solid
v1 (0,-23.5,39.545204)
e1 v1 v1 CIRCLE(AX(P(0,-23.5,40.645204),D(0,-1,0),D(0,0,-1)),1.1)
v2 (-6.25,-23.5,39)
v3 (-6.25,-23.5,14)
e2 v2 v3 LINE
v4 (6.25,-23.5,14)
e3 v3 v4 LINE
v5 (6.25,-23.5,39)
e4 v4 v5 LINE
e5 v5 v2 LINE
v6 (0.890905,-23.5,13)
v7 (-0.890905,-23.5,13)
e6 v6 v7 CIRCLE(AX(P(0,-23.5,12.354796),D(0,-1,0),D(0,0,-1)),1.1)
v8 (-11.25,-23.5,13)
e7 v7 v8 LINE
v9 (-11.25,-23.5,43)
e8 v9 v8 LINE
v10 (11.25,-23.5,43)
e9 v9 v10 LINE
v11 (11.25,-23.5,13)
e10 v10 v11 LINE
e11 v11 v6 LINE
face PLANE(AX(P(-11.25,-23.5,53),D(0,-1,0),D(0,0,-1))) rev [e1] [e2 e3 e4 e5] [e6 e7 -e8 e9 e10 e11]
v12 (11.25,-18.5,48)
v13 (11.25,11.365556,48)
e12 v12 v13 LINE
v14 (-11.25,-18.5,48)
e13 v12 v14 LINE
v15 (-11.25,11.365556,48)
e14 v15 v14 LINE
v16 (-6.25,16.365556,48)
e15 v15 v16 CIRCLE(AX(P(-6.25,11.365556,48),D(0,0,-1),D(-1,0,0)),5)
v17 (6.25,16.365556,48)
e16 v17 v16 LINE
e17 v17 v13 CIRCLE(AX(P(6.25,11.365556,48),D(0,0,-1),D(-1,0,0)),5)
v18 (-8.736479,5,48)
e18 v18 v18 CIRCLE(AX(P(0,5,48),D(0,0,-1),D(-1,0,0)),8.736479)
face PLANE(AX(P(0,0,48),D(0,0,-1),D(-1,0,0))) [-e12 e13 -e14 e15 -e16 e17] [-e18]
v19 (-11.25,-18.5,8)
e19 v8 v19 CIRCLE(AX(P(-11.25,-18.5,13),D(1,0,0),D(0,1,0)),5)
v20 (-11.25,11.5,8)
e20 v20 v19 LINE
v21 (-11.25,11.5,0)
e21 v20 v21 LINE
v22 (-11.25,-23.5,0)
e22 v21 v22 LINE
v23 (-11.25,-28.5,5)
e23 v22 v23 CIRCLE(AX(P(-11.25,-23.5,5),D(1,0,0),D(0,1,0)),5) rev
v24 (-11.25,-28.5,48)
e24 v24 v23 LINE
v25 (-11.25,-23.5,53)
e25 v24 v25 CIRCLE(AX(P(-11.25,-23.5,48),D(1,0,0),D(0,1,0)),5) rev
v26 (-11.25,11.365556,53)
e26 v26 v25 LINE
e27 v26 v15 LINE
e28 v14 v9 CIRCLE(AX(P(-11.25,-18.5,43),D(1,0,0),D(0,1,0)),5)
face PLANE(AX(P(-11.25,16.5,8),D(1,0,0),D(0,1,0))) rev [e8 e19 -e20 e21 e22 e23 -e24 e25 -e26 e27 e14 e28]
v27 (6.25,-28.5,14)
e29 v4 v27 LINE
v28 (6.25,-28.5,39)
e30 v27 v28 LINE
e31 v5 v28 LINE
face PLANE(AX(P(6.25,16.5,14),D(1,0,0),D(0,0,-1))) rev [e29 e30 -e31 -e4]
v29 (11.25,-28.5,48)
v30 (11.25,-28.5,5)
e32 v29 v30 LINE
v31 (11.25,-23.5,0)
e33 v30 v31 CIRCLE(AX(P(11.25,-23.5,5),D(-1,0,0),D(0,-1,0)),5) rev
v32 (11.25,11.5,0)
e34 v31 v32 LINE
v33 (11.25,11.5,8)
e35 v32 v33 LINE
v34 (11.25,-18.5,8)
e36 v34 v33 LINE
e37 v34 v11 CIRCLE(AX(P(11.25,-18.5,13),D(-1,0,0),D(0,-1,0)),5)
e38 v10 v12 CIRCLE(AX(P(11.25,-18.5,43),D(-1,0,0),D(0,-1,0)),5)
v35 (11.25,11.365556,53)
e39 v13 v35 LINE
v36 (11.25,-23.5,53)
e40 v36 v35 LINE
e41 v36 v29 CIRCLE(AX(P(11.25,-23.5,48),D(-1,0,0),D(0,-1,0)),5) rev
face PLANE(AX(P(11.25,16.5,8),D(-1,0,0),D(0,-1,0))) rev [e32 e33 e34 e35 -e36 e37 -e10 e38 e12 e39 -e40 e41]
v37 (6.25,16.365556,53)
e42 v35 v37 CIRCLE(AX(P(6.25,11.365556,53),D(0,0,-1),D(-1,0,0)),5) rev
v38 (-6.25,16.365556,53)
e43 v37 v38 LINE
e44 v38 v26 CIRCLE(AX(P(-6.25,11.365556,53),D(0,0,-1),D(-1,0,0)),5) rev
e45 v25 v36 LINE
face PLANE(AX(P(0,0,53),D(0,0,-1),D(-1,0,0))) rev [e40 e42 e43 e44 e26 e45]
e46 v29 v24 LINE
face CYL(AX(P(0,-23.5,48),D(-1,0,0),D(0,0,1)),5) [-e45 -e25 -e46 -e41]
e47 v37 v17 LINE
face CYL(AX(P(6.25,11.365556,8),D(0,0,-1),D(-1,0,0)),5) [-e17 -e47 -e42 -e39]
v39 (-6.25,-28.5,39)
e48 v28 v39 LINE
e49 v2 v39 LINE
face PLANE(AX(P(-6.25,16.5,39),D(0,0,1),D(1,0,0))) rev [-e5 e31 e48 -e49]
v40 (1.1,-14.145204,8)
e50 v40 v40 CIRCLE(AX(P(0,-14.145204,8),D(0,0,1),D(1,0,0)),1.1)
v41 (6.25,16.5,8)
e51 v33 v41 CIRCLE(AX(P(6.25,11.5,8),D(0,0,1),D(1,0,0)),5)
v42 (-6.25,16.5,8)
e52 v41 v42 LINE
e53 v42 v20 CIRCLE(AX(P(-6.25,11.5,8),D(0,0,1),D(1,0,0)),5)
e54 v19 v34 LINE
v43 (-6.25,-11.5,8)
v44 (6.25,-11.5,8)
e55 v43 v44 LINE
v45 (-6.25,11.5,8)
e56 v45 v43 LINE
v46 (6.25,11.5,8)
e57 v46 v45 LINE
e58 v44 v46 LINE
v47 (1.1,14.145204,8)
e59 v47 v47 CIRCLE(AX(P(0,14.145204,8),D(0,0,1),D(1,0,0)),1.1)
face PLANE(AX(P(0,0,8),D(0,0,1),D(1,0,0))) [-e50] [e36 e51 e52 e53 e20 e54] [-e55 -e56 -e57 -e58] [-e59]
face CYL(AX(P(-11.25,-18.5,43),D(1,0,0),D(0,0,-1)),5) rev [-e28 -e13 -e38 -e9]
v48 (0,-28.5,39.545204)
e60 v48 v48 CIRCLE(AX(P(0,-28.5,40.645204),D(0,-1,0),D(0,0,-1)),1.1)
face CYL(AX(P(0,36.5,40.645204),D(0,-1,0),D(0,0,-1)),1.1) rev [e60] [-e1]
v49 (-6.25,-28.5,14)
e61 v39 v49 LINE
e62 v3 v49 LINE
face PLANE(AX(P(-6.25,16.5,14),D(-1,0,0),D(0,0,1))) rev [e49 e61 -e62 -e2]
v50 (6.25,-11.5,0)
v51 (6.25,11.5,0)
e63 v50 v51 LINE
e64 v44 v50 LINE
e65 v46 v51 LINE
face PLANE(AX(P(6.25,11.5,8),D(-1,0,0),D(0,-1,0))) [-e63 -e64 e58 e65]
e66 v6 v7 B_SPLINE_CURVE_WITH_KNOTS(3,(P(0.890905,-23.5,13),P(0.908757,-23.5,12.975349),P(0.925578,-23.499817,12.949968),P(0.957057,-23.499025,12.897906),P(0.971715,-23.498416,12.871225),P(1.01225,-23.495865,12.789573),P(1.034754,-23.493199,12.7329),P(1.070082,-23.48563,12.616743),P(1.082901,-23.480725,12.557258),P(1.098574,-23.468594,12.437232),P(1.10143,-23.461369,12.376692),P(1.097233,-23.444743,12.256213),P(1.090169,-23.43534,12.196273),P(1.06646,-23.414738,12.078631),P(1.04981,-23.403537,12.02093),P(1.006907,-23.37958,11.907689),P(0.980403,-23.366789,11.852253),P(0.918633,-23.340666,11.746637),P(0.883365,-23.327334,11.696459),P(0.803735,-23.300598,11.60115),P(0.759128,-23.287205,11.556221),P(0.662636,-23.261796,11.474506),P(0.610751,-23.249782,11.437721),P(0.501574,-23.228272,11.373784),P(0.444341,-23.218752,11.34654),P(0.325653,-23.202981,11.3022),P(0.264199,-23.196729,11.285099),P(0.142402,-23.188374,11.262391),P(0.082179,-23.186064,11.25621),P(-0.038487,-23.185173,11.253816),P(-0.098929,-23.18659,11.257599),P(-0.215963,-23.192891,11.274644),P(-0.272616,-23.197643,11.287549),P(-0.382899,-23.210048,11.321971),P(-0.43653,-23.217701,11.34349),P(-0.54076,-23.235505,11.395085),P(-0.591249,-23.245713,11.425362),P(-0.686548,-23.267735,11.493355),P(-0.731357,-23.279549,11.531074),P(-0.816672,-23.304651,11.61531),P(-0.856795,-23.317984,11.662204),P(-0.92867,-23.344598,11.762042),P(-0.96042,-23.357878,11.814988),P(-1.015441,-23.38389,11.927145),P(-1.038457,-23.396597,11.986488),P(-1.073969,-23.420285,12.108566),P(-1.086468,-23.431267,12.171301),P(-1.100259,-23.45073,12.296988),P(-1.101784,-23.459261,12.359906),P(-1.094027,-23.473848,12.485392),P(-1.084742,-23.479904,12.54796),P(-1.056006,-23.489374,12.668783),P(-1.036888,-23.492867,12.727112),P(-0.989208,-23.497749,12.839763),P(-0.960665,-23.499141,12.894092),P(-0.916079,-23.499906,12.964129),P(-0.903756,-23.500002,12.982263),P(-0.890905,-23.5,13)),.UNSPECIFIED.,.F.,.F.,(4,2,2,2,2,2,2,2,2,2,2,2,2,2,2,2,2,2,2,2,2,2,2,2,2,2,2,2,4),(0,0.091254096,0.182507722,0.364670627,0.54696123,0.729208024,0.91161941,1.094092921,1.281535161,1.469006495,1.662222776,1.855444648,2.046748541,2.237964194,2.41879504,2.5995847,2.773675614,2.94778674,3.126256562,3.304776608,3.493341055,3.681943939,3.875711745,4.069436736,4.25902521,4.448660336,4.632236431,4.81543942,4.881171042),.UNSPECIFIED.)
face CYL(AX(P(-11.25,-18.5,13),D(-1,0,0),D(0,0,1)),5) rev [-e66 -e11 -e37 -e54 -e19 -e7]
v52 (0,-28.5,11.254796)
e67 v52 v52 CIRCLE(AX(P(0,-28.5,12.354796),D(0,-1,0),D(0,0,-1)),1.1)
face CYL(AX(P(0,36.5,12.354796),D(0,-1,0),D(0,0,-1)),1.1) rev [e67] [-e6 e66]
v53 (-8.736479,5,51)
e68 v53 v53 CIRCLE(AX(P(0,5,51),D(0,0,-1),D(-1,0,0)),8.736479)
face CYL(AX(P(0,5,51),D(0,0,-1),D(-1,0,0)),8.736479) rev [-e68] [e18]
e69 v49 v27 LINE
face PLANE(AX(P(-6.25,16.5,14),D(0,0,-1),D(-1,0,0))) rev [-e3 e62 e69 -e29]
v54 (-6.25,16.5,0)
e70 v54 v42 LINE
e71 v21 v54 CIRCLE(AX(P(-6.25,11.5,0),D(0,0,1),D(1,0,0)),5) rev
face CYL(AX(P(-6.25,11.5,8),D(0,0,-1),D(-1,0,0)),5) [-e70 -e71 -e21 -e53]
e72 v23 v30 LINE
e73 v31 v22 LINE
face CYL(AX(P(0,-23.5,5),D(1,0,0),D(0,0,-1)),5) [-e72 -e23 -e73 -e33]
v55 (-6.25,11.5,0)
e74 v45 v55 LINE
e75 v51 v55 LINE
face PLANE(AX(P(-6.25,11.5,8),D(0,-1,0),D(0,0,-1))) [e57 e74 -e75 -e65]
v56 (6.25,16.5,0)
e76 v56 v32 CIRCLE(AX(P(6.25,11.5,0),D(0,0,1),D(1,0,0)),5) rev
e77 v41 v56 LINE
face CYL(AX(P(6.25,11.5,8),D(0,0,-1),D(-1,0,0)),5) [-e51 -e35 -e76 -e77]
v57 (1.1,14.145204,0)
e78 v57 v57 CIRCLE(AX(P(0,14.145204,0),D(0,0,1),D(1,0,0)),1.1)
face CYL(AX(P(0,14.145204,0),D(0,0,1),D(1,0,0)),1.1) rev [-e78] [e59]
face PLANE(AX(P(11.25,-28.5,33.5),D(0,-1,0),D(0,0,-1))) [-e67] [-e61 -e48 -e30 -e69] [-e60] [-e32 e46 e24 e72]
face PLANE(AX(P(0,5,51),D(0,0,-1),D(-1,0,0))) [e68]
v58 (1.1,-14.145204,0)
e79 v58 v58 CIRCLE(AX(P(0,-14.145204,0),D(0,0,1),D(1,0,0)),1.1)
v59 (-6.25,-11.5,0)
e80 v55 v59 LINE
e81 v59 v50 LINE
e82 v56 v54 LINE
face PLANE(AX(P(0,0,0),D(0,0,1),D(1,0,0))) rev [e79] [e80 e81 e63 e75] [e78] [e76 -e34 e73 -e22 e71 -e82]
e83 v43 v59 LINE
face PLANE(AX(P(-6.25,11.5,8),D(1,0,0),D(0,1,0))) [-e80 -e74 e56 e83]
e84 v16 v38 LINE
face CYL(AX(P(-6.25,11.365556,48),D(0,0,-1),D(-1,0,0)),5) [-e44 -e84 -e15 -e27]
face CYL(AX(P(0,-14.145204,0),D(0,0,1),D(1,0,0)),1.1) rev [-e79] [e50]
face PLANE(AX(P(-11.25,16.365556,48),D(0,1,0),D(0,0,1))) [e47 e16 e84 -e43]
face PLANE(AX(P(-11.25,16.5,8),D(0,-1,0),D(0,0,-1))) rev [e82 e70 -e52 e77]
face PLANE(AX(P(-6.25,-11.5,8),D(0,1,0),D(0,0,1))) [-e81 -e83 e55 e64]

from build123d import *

# Parameters (mm, degrees)
SKETCH1_W           = 22.5
SKETCH1_H           = 33
SKETCH1_W_2         = 12.5
SKETCH1_H_2         = 23
BOSS_EXTRUDE1_DEPTH = 8
SKETCH2_R           = 1.1
CUT_EXTRUDE1_DEPTH  = 22.513077418
SKETCH4_W           = 22.5
SKETCH4_H           = 12
BOSS_EXTRUDE3_DEPTH = 8
SKETCH5_W           = 22.5
SKETCH5_H           = 5
BOSS_EXTRUDE4_DEPTH = 45
SKETCH6_W           = 12.5
SKETCH6_H           = 25
CUT_EXTRUDE2_DEPTH  = 71.431260815
SKETCH7_R           = 1.1
CUT_EXTRUDE3_DEPTH  = 65
FILLET1_R           = 5
SKETCH9_W           = 22.5
SKETCH9_H           = 44.865556073
BOSS_EXTRUDE5_DEPTH = 5
SKETCH10_R          = 8.736478528
CUT_EXTRUDE4_DEPTH  = 3
FILLET2_R           = 5
FILLET3_R           = 5
FILLET4_R           = 5


with BuildPart() as part:
    # Sketch1 → Boss-Extrude1 (new body)
    with BuildSketch(Plane.XY):
        Rectangle(SKETCH1_W, SKETCH1_H)
        Rectangle(SKETCH1_W_2, SKETCH1_H_2, mode=Mode.SUBTRACT)
    extrude(amount=BOSS_EXTRUDE1_DEPTH)

    # Sketch2 → Cut-Extrude1 (cut, through all)
    with BuildSketch(Plane.XY.offset(8)):
        with Locations((0, -14.145204103)):
            Circle(SKETCH2_R)
        with Locations((0, 14.145204103)):
            Circle(SKETCH2_R)
    extrude(amount=-CUT_EXTRUDE1_DEPTH, mode=Mode.SUBTRACT)

    # Sketch4 → Boss-Extrude3 (add)
    with BuildSketch(Plane(origin=(0, 0, 0), x_dir=(-1, 0, 0), z_dir=(0, 0, -1))):
        with Locations((0, -22.5)):
            Rectangle(SKETCH4_W, SKETCH4_H)
    extrude(amount=-BOSS_EXTRUDE3_DEPTH)

    # Sketch5 → Boss-Extrude4 (add)
    with BuildSketch(Plane.XY.offset(8)):
        with Locations((0, -26)):
            Rectangle(SKETCH5_W, SKETCH5_H)
    extrude(amount=BOSS_EXTRUDE4_DEPTH)

    # Sketch6 → Cut-Extrude2 (cut, through all)
    with BuildSketch(Plane.XZ.offset(28.5)):
        with Locations((0, 26.5)):
            Rectangle(SKETCH6_W, SKETCH6_H)
    extrude(amount=-CUT_EXTRUDE2_DEPTH, mode=Mode.SUBTRACT)

    # Sketch7 → Cut-Extrude3 (cut)
    with BuildSketch(Plane.XZ.offset(28.5)):
        with Locations(Location((0, 40.645204103, 0), (0, 0, 270))):
            Circle(SKETCH7_R)
        with Locations(Location((0, 12.354795897, 0), (0, 0, 270))):
            Circle(SKETCH7_R)
    extrude(amount=-CUT_EXTRUDE3_DEPTH, mode=Mode.SUBTRACT)

    # Fillet1
    # the kernel refuses this fillet: 5 mm, written as the material it adds along each edge
    with BuildSketch(Plane(origin=(11.25, -23.5, 8), x_dir=(0, 1, 0), z_dir=(-1, 0, 0))) as fillet1_piece_1_section:
        with BuildLine():
            CenterArc((FILLET1_R, -FILLET1_R), FILLET1_R, 90, 90)
            Line((0, -FILLET1_R), (0, 0))
            Line((0, 0), (FILLET1_R, 0))
        make_face()
    fillet1_piece_1 = extrude(amount=22.5, mode=Mode.PRIVATE)
    fillet1_piece_1 = fillet1_piece_1 - Plane(origin=(0, -22.363323705, 12.354795897), x_dir=(0, 0, -1), z_dir=(0, -1, 0)) * Cylinder(1.1, 65, mode=Mode.PRIVATE)
    add(fillet1_piece_1)

    # Sketch9 → Boss-Extrude5 (add)
    with BuildSketch(Plane.XY.offset(53)):
        with Locations((0, -6.067221963)):
            Rectangle(SKETCH9_W, SKETCH9_H)
    extrude(amount=-BOSS_EXTRUDE5_DEPTH)

    # Sketch10 → Cut-Extrude4 (cut)
    with BuildSketch(Plane(origin=(0, 0, 48), x_dir=(-1, 0, 0), z_dir=(0, 0, -1))):
        with Locations((0, 5)):
            Circle(SKETCH10_R)
    extrude(amount=-CUT_EXTRUDE4_DEPTH, mode=Mode.SUBTRACT)

    # Fillet2
    fillet2_edges = [part.edges().sort_by_distance(p)[0] for p in [
        (0, -23.5, 48),
    ]]
    fillet(fillet2_edges, radius=FILLET2_R)

    # Fillet3
    fillet3_edges = [part.edges().sort_by_distance(p)[0] for p in [
        (0, -28.5, 0),
        (0, -28.5, 53),
    ]]
    fillet(fillet3_edges, radius=FILLET3_R)

    # Fillet4
    fillet4_edges = [part.edges().sort_by_distance(p)[0] for p in [
        (11.25, 16.365556073, 50.5),
        (-11.25, 16.365556073, 50.5),
        (-11.25, 16.5, 4),
        (11.25, 16.5, 4),
    ]]
    fillet(fillet4_edges, radius=FILLET4_R)


solid = part.part
